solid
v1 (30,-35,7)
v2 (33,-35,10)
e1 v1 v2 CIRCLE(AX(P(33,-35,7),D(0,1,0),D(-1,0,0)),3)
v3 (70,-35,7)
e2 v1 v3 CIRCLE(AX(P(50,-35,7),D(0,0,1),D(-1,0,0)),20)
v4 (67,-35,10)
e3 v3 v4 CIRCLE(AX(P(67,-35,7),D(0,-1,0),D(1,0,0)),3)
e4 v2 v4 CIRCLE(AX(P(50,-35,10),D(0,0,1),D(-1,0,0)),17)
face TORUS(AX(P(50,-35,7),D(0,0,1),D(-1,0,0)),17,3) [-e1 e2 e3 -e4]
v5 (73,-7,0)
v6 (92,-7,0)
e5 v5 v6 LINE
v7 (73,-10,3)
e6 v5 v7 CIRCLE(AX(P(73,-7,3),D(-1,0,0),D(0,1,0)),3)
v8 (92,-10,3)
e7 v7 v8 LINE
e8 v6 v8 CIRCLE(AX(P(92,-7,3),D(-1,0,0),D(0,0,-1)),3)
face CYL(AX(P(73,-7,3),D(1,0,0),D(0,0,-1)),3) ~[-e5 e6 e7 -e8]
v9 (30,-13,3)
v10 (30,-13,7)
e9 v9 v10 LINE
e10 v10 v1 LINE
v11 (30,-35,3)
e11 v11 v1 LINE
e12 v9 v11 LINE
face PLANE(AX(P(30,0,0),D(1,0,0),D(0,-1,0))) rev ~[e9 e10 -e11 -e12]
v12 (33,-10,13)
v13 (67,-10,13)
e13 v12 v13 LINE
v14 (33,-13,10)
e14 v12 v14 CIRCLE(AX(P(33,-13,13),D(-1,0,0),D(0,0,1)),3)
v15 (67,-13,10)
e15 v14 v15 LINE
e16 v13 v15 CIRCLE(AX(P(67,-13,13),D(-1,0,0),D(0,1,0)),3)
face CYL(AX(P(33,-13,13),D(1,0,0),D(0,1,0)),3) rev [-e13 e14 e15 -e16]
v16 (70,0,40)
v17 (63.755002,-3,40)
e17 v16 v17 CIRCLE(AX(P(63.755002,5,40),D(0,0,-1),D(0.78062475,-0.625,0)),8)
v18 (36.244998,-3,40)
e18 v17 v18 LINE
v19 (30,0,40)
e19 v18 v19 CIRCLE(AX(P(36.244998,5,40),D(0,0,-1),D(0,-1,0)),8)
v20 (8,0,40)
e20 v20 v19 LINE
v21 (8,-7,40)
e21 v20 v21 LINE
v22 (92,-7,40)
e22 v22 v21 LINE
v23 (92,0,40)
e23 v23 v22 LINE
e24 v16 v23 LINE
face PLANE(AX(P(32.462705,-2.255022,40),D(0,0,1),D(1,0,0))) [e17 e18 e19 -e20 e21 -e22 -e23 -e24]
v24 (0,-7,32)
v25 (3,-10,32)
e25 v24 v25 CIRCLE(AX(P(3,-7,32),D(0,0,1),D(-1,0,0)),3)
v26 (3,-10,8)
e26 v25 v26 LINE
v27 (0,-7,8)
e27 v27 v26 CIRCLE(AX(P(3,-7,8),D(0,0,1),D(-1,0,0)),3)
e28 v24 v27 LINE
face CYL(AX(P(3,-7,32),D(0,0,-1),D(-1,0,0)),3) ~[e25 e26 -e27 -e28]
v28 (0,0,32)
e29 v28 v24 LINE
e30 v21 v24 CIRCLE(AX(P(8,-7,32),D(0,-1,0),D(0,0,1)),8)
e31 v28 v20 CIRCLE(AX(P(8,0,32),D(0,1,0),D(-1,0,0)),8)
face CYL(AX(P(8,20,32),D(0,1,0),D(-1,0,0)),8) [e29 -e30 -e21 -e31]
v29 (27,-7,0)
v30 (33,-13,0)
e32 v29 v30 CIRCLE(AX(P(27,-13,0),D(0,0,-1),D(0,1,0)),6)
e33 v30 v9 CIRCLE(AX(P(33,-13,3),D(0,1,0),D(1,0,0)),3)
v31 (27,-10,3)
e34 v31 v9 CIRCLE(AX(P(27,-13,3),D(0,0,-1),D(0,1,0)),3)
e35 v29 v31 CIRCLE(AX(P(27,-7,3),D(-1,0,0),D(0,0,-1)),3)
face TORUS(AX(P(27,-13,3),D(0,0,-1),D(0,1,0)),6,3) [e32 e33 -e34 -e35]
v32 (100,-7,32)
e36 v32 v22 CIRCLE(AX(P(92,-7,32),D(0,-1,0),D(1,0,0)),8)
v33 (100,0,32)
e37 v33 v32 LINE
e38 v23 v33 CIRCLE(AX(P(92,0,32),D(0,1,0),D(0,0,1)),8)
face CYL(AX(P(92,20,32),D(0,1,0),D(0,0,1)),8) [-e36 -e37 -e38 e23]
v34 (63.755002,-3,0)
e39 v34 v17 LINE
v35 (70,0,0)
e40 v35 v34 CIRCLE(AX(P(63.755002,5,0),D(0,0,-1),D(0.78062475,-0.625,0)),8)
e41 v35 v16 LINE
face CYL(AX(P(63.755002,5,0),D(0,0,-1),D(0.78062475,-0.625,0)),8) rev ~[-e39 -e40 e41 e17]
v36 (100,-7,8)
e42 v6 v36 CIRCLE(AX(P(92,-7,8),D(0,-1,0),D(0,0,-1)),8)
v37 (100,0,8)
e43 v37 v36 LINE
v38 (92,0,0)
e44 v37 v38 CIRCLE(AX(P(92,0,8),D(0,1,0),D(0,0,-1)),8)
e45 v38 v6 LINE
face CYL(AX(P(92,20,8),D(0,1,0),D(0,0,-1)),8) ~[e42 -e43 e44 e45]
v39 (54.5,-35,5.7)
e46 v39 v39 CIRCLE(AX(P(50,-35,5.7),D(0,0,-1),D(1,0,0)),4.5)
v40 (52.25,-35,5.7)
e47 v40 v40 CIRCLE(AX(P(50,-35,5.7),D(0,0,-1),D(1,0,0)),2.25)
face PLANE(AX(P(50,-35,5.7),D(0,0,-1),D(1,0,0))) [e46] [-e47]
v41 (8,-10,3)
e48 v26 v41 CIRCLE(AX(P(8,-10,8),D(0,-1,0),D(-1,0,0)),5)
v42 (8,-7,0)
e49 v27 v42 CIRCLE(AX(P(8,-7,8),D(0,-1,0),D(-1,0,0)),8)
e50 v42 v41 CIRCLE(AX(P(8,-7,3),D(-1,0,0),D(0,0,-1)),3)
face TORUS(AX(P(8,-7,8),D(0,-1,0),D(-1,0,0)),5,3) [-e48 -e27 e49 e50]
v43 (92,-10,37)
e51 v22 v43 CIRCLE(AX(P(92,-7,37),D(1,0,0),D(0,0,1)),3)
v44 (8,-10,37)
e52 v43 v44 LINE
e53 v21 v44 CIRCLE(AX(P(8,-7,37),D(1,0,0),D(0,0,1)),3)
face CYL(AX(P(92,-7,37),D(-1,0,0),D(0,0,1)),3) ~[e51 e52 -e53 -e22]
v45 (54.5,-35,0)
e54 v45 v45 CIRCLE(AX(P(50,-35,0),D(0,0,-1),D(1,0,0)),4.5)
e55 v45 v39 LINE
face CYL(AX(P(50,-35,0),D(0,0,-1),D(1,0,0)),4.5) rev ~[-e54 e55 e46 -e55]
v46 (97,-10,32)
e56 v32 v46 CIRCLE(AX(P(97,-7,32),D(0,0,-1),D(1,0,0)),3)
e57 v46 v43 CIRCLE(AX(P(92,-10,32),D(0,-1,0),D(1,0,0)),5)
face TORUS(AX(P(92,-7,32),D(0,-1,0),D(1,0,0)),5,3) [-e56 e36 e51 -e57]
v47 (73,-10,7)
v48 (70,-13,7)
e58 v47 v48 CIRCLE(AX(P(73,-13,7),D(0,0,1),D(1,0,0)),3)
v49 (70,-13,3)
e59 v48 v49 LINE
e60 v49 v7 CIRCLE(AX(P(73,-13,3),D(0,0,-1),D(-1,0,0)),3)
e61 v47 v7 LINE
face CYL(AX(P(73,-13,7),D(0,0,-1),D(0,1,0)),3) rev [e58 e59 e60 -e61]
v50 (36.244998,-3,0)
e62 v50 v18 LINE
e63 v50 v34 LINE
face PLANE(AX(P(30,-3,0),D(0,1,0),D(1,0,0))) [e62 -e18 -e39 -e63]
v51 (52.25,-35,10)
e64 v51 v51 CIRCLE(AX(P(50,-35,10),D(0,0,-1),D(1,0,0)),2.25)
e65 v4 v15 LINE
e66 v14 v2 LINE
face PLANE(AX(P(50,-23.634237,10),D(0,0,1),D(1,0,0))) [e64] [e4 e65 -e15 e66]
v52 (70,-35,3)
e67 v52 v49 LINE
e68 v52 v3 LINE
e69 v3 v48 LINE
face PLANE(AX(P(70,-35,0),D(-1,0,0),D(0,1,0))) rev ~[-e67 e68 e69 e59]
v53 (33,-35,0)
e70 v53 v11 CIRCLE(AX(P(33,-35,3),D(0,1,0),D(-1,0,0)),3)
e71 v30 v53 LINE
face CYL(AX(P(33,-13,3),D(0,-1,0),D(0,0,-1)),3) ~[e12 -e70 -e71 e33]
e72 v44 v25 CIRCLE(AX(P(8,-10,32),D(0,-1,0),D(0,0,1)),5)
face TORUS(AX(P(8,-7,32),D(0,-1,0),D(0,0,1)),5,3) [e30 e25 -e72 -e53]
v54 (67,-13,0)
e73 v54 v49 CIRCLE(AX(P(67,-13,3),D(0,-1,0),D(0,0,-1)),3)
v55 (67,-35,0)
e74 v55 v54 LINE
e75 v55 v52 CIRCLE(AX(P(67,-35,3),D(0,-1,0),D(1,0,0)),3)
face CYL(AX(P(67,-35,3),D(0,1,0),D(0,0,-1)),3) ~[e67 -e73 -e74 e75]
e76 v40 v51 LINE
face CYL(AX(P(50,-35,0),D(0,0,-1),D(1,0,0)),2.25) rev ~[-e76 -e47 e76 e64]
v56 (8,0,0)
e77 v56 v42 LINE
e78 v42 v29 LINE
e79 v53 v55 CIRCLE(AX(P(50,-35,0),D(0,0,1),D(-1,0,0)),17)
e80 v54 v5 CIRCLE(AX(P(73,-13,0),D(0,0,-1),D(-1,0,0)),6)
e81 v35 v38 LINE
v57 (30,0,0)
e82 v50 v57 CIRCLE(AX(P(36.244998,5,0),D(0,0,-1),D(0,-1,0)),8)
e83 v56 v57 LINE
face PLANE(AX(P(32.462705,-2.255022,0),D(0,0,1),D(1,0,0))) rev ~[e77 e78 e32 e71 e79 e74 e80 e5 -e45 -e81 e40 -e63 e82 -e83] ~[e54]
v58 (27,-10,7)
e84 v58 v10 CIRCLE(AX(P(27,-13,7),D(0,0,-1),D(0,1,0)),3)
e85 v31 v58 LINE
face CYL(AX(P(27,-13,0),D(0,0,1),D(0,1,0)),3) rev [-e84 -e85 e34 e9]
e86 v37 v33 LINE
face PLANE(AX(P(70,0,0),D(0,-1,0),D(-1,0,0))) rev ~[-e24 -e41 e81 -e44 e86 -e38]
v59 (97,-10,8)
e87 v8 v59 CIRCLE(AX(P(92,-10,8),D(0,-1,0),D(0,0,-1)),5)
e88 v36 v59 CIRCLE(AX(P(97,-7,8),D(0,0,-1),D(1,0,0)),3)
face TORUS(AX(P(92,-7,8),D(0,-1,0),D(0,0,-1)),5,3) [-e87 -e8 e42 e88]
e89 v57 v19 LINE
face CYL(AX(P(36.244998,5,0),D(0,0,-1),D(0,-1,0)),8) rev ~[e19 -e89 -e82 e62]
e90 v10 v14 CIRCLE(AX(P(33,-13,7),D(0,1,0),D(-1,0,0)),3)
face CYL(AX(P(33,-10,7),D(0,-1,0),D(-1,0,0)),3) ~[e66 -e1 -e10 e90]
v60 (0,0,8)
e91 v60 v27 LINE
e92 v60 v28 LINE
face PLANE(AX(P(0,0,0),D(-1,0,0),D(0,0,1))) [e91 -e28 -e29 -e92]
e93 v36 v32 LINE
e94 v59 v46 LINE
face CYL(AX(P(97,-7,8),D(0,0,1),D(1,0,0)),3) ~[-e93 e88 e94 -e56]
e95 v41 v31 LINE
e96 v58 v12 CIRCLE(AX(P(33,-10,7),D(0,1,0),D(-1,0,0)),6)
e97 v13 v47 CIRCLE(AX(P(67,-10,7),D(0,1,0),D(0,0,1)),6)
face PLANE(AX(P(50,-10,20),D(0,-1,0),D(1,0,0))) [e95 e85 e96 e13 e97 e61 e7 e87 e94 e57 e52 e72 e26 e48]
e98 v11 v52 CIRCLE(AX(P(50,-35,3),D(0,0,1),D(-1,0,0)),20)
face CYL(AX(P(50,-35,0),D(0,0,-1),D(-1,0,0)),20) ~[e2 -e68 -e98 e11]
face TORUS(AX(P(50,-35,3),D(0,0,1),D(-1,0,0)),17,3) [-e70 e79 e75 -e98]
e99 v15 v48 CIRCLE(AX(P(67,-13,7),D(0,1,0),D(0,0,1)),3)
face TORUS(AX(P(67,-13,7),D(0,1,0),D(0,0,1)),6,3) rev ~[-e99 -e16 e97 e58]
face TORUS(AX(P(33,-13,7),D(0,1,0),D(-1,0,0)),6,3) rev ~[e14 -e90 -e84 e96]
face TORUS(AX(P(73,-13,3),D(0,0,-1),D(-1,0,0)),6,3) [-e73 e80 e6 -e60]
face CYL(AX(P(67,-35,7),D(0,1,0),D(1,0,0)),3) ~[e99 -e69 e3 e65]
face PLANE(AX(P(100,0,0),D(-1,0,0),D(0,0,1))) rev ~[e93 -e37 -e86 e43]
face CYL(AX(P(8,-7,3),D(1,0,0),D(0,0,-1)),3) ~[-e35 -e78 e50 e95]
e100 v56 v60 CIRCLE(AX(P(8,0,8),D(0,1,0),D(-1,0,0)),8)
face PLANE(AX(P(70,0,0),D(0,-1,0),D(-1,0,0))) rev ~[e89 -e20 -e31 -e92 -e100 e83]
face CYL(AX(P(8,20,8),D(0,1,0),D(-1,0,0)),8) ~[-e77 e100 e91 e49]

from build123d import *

# Parameters (mm, degrees)
F0_W          = 100
F0_H          = 40
F1_DEPTH      = 10
F3_DEPTH      = 10
F4_W          = 40
F4_H          = 3
F5_DEPTH      = 40.001
F6_R          = 2.25
F7_DEPTH      = 40.001
F8_R          = 4.5
F9_DEPTH      = 5.7
F10_T1_DEPTH  = 40
F10_T3_DEPTH  = 40
F10_T5_DEPTH  = 50
F10_T7_DEPTH  = 50
F10_T9_DEPTH  = 50
F10_T11_DEPTH = 50
F11_F1_R      = 3
F11_F2_R      = 3
F11_F3_R      = 3


# Not quite as in the source:
# - a fillet or chamfer that OpenCascade refuses, or shapes differently, is made with other operations: its cross-section is extruded or revolved along the edge and cut away or added


with BuildPart() as f1:
    # F0 (on Front) → F1 (new body)
    with BuildSketch(Plane.XZ):
        with Locations((50, 20)):
            Rectangle(F0_W, F0_H)
    extrude(amount=F1_DEPTH)

    # F2 (on Top) → F3 (join)
    with BuildSketch(Plane.XY):
        with BuildLine():
            Line((70, 0), (30, 0))
            Line((30, 0), (30, -35))
            ThreePointArc((30, -35), (50, -55), (70, -35))
            Line((70, -35), (70, 0))
        make_face()
    extrude(amount=F3_DEPTH)

    # F4 (on face) → F5 (cut, through all)
    with BuildSketch(Plane(origin=(0, 0, 0), x_dir=(1, 0, 0), z_dir=(0, 0, -1))):
        with Locations((50, 1.5)):
            Rectangle(F4_W, F4_H)
    extrude(amount=-F5_DEPTH, mode=Mode.SUBTRACT)

    # F6 (on face) → F7 (cut, through all)
    with BuildSketch(Plane(origin=(0, 0, 0), x_dir=(1, 0, 0), z_dir=(0, 0, -1))):
        with Locations((50, 35)):
            Circle(F6_R)
    extrude(amount=-F7_DEPTH, mode=Mode.SUBTRACT)

    # F8 (on face) → F9 (cut)
    with BuildSketch(Plane(origin=(0, 0, 0), x_dir=(1, 0, 0), z_dir=(0, 0, -1))):
        with Locations((50, 35)):
            Circle(F8_R)
    extrude(amount=-F9_DEPTH, mode=Mode.SUBTRACT)

    # F10: fillet of radius 8 on 6 edges, made by hand

    # F10_s2 → F10_t1 (join)
    with BuildSketch(Plane.XY):
        with BuildLine():
            ThreePointArc((70, 0), (67.2191036167, -2.2111025509), (63.7550020016, -3))
            Line((63.7550020016, -3), (70, -3))
            Line((70, -3), (70, 0))
        make_face()
    extrude(amount=F10_T1_DEPTH)

    # F10_s4 → F10_t3 (join)
    with BuildSketch(Plane.XY):
        with BuildLine():
            ThreePointArc((36.2449979984, -3), (32.7808963833, -2.2111025509), (30, 0))
            Line((30, 0), (30, -3))
            Line((30, -3), (36.2449979984, -3))
        make_face()
    extrude(amount=F10_T3_DEPTH)

    # F10_s6 → F10_t5 (cut)
    with BuildSketch(Plane.XZ.offset(-20)):
        with BuildLine():
            ThreePointArc((0, 32), (2.3431457505, 37.6568542495), (8, 40))
            Line((8, 40), (0, 40))
            Line((0, 40), (0, 32))
        make_face()
    extrude(amount=F10_T5_DEPTH, mode=Mode.SUBTRACT)

    # F10_s8 → F10_t7 (cut)
    with BuildSketch(Plane.XZ.offset(-20)):
        with BuildLine():
            ThreePointArc((0, 8), (2.3431457505, 2.3431457505), (8, 0))
            Line((8, 0), (0, 0))
            Line((0, 0), (0, 8))
        make_face()
    extrude(amount=F10_T7_DEPTH, mode=Mode.SUBTRACT)

    # F10_s10 → F10_t9 (cut)
    with BuildSketch(Plane.XZ.offset(-20)):
        with BuildLine():
            ThreePointArc((92, 40), (97.6568542495, 37.6568542495), (100, 32))
            Line((100, 32), (100, 40))
            Line((100, 40), (92, 40))
        make_face()
    extrude(amount=F10_T9_DEPTH, mode=Mode.SUBTRACT)

    # F10_s12 → F10_t11 (cut)
    with BuildSketch(Plane.XZ.offset(-20)):
        with BuildLine():
            ThreePointArc((92, 0), (97.6568542495, 2.3431457505), (100, 8))
            Line((100, 8), (100, 0))
            Line((100, 0), (92, 0))
        make_face()
    extrude(amount=F10_T11_DEPTH, mode=Mode.SUBTRACT)

    # F11: fillet of radius 3 on 17 edges, made by hand

    # F11_f1
    f11_f1_edges = [f1.edges().sort_by_distance(p)[0] for p in [
        (50, -55, 10),
        (70, -22.5, 10),
        (30, -22.5, 10),
    ]]
    fillet(f11_f1_edges, radius=F11_F1_R)

    # F11_f2
    f11_f2_edges = [f1.edges().sort_by_distance(p)[0] for p in [
        (70, -10, 3.5),
        (50, -10, 10),
        (69.1213203436, -10, 9.1213203436),
        (30.8786796564, -10, 9.1213203436),
    ]]
    fillet(f11_f2_edges, radius=F11_F2_R)

    # F11_f3
    f11_f3_edges = [f1.edges().sort_by_distance(p)[0] for p in [
        (50, -55, 0),
        (0, -10, 20),
        (2.3431457505, -10, 2.3431457505),
        (17.5, -10, 0),
        (2.3431457505, -10, 37.6568542495),
        (50, -10, 40),
        (97.6568542495, -10, 37.6568542495),
        (100, -10, 20),
        (97.6568542495, -10, 2.3431457505),
        (82.5, -10, 0),
        (70, -24, 0),
        (30, -24, 0),
        (29.1213203436, -10.8786796564, 0),
        (70.8786796564, -10.8786796564, 0),
    ]]
    fillet(f11_f3_edges, radius=F11_F3_R)


solid = f1.part
